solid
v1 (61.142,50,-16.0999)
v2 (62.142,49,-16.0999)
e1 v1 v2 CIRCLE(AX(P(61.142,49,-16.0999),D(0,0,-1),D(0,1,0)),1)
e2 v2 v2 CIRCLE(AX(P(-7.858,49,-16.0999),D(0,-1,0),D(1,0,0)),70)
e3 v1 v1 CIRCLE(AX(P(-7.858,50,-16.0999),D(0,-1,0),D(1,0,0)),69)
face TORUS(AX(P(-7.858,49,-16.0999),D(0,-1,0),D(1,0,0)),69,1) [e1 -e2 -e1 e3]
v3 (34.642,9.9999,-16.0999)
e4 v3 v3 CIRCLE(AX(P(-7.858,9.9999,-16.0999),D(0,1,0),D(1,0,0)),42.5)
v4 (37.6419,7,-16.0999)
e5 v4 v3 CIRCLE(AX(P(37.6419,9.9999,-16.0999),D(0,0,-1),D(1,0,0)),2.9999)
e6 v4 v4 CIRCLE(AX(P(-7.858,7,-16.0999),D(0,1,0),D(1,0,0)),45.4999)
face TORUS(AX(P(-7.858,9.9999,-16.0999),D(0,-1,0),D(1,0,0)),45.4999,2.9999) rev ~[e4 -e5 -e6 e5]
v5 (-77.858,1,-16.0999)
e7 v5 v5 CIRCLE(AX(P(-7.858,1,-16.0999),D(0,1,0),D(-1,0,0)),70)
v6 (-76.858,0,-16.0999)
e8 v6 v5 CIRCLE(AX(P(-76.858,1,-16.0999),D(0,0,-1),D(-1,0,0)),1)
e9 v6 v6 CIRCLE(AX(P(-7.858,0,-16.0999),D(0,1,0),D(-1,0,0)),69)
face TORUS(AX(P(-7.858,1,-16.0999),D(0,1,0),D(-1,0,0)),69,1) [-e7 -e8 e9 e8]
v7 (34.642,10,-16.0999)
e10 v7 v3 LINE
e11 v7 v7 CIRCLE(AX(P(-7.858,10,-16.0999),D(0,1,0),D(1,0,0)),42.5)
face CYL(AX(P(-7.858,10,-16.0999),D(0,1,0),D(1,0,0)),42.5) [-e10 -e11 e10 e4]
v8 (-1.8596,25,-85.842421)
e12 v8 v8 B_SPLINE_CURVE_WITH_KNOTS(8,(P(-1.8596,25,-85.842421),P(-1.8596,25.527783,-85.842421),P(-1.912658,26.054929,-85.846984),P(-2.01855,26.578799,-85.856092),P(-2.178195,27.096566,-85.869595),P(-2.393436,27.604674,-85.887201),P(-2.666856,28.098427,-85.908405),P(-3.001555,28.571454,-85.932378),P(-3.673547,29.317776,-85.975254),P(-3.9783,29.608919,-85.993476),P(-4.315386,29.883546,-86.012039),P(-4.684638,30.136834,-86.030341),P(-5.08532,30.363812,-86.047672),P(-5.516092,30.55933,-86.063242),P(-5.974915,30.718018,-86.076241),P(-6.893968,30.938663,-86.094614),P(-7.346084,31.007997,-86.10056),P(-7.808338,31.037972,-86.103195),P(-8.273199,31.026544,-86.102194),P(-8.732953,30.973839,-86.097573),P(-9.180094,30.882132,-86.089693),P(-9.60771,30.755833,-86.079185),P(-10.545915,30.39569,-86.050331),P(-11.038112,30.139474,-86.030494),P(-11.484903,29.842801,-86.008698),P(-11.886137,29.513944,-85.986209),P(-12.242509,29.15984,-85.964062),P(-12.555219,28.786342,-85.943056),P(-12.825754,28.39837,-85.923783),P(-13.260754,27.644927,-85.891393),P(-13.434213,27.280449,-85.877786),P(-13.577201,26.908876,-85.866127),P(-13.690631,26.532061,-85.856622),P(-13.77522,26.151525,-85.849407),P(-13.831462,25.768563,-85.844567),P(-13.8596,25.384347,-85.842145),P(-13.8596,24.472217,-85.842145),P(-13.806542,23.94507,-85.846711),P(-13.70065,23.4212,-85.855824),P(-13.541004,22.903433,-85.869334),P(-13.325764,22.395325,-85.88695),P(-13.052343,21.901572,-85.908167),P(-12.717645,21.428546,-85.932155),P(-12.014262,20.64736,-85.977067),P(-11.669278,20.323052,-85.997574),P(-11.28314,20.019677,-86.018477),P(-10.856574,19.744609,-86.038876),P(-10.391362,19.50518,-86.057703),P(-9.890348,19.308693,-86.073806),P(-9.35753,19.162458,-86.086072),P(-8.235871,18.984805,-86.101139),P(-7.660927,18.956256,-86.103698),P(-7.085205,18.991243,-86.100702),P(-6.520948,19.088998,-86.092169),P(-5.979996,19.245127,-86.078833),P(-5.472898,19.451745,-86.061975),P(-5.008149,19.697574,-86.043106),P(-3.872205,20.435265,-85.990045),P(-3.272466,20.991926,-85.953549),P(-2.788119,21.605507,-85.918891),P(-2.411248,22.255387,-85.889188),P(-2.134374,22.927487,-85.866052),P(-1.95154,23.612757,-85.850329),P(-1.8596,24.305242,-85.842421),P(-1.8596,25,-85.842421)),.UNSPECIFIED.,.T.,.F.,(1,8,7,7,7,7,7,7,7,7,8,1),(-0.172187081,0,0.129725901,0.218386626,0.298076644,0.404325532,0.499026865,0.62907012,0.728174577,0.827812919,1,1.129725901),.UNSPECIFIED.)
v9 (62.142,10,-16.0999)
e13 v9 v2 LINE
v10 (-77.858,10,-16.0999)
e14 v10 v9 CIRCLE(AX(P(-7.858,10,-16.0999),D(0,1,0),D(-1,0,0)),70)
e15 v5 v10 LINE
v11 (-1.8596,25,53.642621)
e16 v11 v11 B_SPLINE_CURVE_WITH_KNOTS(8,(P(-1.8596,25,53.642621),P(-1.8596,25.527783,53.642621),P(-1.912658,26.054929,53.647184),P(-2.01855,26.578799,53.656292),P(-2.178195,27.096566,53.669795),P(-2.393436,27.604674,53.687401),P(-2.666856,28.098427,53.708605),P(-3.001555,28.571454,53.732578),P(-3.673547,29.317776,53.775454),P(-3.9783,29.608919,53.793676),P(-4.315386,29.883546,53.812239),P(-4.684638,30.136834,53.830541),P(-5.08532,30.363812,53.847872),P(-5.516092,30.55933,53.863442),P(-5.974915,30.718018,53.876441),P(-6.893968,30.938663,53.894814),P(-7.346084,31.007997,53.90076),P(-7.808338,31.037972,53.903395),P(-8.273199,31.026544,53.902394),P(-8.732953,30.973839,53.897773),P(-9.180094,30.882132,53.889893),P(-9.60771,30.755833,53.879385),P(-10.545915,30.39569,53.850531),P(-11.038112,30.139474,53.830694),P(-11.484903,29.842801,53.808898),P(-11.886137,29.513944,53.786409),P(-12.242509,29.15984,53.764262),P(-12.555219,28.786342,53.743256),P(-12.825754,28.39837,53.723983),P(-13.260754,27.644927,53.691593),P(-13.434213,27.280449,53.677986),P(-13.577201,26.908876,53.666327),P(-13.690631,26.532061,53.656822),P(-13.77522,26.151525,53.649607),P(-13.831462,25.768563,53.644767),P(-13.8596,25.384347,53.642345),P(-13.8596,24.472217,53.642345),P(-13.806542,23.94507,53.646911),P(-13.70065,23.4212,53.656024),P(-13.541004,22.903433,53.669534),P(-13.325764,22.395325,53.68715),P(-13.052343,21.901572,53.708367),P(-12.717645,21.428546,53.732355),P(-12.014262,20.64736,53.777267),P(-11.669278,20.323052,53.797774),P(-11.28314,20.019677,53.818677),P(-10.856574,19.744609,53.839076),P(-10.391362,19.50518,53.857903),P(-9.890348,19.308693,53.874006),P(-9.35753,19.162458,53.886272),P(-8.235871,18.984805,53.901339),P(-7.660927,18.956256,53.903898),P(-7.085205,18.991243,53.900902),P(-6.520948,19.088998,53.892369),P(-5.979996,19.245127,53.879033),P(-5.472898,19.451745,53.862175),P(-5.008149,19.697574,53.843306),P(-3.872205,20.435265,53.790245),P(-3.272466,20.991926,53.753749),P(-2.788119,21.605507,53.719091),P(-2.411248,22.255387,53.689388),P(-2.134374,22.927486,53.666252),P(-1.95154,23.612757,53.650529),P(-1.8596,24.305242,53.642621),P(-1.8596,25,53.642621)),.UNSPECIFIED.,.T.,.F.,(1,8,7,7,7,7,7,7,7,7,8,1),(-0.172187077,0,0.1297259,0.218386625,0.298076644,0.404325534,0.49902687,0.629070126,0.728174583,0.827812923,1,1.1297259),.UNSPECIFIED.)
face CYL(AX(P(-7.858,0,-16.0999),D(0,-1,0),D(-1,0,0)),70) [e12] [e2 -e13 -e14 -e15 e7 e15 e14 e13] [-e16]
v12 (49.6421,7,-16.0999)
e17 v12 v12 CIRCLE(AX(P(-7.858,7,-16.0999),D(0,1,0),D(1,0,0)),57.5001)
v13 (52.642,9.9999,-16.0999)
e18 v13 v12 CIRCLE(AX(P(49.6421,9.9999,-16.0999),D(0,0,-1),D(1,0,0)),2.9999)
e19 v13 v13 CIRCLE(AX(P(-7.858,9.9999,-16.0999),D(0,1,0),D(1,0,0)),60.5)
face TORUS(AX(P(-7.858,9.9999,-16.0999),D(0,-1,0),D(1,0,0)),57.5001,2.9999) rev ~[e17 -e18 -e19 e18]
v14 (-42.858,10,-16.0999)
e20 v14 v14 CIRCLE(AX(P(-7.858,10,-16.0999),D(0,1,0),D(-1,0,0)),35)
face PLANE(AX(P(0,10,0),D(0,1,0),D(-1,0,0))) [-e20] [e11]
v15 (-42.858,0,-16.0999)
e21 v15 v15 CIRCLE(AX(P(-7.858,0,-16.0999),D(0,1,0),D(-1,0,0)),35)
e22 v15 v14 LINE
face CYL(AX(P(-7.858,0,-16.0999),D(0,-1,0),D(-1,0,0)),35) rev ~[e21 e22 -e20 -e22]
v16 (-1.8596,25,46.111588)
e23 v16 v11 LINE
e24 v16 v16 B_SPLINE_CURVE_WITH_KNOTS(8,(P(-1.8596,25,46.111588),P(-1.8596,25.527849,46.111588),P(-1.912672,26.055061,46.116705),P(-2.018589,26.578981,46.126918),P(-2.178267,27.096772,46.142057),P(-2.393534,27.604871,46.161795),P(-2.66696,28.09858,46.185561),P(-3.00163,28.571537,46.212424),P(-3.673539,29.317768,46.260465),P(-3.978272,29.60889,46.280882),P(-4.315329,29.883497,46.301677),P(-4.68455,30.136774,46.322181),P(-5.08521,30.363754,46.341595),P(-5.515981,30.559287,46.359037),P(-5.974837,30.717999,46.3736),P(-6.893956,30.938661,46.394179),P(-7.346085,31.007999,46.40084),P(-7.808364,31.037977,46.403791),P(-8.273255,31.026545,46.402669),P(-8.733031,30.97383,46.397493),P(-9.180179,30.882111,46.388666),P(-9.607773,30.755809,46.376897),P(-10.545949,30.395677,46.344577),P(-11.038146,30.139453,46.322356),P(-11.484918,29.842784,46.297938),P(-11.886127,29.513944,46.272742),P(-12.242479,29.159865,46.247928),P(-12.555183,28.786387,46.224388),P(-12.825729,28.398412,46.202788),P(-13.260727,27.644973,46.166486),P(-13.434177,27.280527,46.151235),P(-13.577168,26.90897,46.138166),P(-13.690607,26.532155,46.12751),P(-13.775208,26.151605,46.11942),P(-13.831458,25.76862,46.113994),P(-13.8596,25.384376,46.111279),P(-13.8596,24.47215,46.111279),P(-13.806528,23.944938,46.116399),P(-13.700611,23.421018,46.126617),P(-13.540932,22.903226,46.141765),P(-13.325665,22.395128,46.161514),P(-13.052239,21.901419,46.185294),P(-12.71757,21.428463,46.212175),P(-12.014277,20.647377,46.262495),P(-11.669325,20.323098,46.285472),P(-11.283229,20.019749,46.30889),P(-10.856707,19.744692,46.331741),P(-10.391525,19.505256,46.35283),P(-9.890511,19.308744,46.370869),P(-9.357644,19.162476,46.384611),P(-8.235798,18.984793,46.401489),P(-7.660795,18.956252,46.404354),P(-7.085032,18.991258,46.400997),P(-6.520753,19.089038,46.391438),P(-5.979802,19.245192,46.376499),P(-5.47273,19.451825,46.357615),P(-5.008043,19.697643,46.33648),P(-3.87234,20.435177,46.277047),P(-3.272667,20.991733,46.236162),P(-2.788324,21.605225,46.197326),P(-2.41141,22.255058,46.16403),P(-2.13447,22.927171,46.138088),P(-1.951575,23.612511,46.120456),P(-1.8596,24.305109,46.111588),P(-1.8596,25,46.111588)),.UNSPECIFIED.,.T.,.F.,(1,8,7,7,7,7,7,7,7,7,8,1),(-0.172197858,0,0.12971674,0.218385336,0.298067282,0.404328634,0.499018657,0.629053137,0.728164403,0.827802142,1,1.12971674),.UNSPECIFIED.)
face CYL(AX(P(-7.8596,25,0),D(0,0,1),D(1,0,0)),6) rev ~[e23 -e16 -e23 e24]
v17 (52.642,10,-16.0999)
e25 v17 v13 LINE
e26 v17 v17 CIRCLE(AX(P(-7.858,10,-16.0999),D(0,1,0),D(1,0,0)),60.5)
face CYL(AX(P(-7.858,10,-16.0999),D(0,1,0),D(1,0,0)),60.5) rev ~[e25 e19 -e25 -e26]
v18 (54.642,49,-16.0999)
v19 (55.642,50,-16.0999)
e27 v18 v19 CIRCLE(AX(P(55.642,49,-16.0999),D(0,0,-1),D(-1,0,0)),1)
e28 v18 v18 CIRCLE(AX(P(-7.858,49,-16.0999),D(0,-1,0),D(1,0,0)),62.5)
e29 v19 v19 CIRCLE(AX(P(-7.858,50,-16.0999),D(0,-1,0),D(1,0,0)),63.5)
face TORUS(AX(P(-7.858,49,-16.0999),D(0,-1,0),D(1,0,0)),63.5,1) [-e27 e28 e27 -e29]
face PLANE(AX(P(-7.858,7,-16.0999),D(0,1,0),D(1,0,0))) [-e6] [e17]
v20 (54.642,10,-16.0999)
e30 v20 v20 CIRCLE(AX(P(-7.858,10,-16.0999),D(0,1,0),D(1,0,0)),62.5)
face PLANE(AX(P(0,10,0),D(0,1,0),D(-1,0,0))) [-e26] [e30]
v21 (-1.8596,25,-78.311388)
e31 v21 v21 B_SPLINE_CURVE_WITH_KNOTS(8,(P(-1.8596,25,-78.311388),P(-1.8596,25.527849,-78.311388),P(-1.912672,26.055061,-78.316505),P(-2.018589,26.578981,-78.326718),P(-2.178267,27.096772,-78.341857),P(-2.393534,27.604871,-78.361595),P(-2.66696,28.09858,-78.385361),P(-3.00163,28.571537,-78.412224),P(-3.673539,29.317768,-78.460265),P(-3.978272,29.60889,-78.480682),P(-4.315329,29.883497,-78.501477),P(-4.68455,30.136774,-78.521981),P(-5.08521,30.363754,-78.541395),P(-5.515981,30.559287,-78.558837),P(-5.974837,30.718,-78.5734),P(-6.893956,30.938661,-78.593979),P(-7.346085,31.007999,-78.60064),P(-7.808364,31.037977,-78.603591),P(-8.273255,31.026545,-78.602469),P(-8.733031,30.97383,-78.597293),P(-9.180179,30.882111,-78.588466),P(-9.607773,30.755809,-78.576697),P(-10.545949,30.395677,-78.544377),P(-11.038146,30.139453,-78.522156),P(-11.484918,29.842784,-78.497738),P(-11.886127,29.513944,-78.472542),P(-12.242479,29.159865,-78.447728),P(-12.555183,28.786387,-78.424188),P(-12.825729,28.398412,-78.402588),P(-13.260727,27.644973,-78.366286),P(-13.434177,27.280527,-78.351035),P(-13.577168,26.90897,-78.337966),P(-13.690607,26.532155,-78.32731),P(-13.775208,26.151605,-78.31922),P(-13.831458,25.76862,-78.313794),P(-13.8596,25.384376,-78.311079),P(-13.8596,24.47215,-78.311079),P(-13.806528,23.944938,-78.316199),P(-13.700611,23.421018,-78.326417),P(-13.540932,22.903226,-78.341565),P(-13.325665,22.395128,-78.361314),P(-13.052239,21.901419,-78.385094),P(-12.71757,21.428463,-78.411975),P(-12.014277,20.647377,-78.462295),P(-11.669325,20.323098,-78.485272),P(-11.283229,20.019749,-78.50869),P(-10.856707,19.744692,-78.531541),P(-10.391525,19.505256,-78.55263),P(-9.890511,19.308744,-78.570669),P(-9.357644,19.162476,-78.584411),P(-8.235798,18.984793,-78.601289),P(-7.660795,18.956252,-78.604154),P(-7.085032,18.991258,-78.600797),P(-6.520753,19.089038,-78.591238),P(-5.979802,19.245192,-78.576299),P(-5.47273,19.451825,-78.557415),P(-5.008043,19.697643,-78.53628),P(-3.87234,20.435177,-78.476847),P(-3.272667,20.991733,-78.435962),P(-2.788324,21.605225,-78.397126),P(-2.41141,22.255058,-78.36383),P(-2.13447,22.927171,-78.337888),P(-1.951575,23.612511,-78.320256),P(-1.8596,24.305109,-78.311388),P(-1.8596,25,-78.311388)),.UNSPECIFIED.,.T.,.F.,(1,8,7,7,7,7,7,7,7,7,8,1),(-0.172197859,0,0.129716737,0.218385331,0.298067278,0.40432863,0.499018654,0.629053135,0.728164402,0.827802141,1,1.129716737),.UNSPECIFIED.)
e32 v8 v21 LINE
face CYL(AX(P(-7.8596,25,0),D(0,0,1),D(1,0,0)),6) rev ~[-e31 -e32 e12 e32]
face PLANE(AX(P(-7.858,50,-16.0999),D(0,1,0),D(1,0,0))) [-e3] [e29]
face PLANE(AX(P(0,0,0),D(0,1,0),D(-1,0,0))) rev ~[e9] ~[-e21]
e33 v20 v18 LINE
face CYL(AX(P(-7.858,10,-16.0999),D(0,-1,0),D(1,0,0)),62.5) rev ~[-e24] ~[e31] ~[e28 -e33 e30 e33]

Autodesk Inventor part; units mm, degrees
ref_plane "YZ Plane" through (0, 0, 0) normal (1, 0, 0) x (0, 1, 0)
ref_plane "XZ Plane" through (0, 0, 0) normal (0, 1, 0) x (-1, 0, 0)
ref_plane "XY Plane" through (0, 0, 0) normal (0, 0, 1) x (1, 0, 0)
sketch "Sketch1" plane through (0, 0, 0) normal (0, 1, 0) x (-1, 0, 0)
  circle A0 centre (7.858, -16.0999) radius 70
  circle A1 centre (7.858, -16.0999) radius 35
  point P0 (0, 0)
  dimension "d0" = 140
  dimension "d1" = 70
extrude "Extrusion1" add sketch "Sketch1" along normal blind 10
sketch "Sketch2" plane through (-7.858, 10, -16.0999) normal (0, 1, 0) x (1, 0, 0)
  circle A0 centre (0, 0) radius 70
  circle A1 centre (0, 0) radius 62.5
  line L0 (0, 0) -> (69.5, 0)
  line L1 (69.5, 0) -> (69.5, 27.6538)
  line L2 (69.5, 27.6538) -> (69.5, -15.3132)
  line L3 (0, 0) -> (-69.5, 0)
  line L4 (-69.5, 0) -> (-69.5, 45.4592)
  point P0 (7.858, -16.0999)
  dimension "d4" = 125
  dimension "d14" = 140
  dimension "d19" = 69.5
  dimension "d20" = 69.5
extrude "Extrusion2" add sketch "Sketch2" along normal blind 40 contours A0 L2 L1 | L1 L0 A1 L3 L4 A0 | A0 L4 L3 A1 L0 L2
sketch "Sketch3" plane through (-7.858, 10, -16.0999) normal (0, 1, 0) x (1, 0, 0)
  circle A0 centre (0, 0) radius 42.5
  circle A1 centre (0, 0) radius 60.5
  point P0 (7.858, -16.0999)
  dimension "d7" = 85
extrude "Extrusion3" cut sketch "Sketch3" against normal blind 3
fillet "Fillet1" radius 3 1 edges at (-68.358, 7, -16.0999)
fillet "Fillet2" radius 3 1 edges at (-50.358, 7, -16.0999)
fillet "Fillet3" radius 1 2 edges at (-77.858, 50, -16.0999) (-70.358, 50, -16.0999)
fillet "Fillet4" radius 1 1 edges at (62.142, 0, -16.0999)
sketch "Sketch4" plane through (0, 0, 0) normal (0, 1, 0) x (-1, 0, 0)
  point P0 (0, 0)
sketch "Sketch5" plane through (0, 0, 0) normal (0, 0, 1) x (1, 0, 0)
  line L0 (-77.858, 1) -> (62.142, 1) projected
  line L1 (62.1388, 1) -> (-77.858, 49)
  line L2 (62.142, 49) -> (-77.858, 49) projected
  circle A0 centre (-7.8596, 25) radius 6
  point P0 (0, 0)
  dimension "d15" = 12
extrude "Extrusion4" cut sketch "Sketch5" along normal mid plane 300
properties part number "ROLAMENTO_INFERIOR_BASE"
